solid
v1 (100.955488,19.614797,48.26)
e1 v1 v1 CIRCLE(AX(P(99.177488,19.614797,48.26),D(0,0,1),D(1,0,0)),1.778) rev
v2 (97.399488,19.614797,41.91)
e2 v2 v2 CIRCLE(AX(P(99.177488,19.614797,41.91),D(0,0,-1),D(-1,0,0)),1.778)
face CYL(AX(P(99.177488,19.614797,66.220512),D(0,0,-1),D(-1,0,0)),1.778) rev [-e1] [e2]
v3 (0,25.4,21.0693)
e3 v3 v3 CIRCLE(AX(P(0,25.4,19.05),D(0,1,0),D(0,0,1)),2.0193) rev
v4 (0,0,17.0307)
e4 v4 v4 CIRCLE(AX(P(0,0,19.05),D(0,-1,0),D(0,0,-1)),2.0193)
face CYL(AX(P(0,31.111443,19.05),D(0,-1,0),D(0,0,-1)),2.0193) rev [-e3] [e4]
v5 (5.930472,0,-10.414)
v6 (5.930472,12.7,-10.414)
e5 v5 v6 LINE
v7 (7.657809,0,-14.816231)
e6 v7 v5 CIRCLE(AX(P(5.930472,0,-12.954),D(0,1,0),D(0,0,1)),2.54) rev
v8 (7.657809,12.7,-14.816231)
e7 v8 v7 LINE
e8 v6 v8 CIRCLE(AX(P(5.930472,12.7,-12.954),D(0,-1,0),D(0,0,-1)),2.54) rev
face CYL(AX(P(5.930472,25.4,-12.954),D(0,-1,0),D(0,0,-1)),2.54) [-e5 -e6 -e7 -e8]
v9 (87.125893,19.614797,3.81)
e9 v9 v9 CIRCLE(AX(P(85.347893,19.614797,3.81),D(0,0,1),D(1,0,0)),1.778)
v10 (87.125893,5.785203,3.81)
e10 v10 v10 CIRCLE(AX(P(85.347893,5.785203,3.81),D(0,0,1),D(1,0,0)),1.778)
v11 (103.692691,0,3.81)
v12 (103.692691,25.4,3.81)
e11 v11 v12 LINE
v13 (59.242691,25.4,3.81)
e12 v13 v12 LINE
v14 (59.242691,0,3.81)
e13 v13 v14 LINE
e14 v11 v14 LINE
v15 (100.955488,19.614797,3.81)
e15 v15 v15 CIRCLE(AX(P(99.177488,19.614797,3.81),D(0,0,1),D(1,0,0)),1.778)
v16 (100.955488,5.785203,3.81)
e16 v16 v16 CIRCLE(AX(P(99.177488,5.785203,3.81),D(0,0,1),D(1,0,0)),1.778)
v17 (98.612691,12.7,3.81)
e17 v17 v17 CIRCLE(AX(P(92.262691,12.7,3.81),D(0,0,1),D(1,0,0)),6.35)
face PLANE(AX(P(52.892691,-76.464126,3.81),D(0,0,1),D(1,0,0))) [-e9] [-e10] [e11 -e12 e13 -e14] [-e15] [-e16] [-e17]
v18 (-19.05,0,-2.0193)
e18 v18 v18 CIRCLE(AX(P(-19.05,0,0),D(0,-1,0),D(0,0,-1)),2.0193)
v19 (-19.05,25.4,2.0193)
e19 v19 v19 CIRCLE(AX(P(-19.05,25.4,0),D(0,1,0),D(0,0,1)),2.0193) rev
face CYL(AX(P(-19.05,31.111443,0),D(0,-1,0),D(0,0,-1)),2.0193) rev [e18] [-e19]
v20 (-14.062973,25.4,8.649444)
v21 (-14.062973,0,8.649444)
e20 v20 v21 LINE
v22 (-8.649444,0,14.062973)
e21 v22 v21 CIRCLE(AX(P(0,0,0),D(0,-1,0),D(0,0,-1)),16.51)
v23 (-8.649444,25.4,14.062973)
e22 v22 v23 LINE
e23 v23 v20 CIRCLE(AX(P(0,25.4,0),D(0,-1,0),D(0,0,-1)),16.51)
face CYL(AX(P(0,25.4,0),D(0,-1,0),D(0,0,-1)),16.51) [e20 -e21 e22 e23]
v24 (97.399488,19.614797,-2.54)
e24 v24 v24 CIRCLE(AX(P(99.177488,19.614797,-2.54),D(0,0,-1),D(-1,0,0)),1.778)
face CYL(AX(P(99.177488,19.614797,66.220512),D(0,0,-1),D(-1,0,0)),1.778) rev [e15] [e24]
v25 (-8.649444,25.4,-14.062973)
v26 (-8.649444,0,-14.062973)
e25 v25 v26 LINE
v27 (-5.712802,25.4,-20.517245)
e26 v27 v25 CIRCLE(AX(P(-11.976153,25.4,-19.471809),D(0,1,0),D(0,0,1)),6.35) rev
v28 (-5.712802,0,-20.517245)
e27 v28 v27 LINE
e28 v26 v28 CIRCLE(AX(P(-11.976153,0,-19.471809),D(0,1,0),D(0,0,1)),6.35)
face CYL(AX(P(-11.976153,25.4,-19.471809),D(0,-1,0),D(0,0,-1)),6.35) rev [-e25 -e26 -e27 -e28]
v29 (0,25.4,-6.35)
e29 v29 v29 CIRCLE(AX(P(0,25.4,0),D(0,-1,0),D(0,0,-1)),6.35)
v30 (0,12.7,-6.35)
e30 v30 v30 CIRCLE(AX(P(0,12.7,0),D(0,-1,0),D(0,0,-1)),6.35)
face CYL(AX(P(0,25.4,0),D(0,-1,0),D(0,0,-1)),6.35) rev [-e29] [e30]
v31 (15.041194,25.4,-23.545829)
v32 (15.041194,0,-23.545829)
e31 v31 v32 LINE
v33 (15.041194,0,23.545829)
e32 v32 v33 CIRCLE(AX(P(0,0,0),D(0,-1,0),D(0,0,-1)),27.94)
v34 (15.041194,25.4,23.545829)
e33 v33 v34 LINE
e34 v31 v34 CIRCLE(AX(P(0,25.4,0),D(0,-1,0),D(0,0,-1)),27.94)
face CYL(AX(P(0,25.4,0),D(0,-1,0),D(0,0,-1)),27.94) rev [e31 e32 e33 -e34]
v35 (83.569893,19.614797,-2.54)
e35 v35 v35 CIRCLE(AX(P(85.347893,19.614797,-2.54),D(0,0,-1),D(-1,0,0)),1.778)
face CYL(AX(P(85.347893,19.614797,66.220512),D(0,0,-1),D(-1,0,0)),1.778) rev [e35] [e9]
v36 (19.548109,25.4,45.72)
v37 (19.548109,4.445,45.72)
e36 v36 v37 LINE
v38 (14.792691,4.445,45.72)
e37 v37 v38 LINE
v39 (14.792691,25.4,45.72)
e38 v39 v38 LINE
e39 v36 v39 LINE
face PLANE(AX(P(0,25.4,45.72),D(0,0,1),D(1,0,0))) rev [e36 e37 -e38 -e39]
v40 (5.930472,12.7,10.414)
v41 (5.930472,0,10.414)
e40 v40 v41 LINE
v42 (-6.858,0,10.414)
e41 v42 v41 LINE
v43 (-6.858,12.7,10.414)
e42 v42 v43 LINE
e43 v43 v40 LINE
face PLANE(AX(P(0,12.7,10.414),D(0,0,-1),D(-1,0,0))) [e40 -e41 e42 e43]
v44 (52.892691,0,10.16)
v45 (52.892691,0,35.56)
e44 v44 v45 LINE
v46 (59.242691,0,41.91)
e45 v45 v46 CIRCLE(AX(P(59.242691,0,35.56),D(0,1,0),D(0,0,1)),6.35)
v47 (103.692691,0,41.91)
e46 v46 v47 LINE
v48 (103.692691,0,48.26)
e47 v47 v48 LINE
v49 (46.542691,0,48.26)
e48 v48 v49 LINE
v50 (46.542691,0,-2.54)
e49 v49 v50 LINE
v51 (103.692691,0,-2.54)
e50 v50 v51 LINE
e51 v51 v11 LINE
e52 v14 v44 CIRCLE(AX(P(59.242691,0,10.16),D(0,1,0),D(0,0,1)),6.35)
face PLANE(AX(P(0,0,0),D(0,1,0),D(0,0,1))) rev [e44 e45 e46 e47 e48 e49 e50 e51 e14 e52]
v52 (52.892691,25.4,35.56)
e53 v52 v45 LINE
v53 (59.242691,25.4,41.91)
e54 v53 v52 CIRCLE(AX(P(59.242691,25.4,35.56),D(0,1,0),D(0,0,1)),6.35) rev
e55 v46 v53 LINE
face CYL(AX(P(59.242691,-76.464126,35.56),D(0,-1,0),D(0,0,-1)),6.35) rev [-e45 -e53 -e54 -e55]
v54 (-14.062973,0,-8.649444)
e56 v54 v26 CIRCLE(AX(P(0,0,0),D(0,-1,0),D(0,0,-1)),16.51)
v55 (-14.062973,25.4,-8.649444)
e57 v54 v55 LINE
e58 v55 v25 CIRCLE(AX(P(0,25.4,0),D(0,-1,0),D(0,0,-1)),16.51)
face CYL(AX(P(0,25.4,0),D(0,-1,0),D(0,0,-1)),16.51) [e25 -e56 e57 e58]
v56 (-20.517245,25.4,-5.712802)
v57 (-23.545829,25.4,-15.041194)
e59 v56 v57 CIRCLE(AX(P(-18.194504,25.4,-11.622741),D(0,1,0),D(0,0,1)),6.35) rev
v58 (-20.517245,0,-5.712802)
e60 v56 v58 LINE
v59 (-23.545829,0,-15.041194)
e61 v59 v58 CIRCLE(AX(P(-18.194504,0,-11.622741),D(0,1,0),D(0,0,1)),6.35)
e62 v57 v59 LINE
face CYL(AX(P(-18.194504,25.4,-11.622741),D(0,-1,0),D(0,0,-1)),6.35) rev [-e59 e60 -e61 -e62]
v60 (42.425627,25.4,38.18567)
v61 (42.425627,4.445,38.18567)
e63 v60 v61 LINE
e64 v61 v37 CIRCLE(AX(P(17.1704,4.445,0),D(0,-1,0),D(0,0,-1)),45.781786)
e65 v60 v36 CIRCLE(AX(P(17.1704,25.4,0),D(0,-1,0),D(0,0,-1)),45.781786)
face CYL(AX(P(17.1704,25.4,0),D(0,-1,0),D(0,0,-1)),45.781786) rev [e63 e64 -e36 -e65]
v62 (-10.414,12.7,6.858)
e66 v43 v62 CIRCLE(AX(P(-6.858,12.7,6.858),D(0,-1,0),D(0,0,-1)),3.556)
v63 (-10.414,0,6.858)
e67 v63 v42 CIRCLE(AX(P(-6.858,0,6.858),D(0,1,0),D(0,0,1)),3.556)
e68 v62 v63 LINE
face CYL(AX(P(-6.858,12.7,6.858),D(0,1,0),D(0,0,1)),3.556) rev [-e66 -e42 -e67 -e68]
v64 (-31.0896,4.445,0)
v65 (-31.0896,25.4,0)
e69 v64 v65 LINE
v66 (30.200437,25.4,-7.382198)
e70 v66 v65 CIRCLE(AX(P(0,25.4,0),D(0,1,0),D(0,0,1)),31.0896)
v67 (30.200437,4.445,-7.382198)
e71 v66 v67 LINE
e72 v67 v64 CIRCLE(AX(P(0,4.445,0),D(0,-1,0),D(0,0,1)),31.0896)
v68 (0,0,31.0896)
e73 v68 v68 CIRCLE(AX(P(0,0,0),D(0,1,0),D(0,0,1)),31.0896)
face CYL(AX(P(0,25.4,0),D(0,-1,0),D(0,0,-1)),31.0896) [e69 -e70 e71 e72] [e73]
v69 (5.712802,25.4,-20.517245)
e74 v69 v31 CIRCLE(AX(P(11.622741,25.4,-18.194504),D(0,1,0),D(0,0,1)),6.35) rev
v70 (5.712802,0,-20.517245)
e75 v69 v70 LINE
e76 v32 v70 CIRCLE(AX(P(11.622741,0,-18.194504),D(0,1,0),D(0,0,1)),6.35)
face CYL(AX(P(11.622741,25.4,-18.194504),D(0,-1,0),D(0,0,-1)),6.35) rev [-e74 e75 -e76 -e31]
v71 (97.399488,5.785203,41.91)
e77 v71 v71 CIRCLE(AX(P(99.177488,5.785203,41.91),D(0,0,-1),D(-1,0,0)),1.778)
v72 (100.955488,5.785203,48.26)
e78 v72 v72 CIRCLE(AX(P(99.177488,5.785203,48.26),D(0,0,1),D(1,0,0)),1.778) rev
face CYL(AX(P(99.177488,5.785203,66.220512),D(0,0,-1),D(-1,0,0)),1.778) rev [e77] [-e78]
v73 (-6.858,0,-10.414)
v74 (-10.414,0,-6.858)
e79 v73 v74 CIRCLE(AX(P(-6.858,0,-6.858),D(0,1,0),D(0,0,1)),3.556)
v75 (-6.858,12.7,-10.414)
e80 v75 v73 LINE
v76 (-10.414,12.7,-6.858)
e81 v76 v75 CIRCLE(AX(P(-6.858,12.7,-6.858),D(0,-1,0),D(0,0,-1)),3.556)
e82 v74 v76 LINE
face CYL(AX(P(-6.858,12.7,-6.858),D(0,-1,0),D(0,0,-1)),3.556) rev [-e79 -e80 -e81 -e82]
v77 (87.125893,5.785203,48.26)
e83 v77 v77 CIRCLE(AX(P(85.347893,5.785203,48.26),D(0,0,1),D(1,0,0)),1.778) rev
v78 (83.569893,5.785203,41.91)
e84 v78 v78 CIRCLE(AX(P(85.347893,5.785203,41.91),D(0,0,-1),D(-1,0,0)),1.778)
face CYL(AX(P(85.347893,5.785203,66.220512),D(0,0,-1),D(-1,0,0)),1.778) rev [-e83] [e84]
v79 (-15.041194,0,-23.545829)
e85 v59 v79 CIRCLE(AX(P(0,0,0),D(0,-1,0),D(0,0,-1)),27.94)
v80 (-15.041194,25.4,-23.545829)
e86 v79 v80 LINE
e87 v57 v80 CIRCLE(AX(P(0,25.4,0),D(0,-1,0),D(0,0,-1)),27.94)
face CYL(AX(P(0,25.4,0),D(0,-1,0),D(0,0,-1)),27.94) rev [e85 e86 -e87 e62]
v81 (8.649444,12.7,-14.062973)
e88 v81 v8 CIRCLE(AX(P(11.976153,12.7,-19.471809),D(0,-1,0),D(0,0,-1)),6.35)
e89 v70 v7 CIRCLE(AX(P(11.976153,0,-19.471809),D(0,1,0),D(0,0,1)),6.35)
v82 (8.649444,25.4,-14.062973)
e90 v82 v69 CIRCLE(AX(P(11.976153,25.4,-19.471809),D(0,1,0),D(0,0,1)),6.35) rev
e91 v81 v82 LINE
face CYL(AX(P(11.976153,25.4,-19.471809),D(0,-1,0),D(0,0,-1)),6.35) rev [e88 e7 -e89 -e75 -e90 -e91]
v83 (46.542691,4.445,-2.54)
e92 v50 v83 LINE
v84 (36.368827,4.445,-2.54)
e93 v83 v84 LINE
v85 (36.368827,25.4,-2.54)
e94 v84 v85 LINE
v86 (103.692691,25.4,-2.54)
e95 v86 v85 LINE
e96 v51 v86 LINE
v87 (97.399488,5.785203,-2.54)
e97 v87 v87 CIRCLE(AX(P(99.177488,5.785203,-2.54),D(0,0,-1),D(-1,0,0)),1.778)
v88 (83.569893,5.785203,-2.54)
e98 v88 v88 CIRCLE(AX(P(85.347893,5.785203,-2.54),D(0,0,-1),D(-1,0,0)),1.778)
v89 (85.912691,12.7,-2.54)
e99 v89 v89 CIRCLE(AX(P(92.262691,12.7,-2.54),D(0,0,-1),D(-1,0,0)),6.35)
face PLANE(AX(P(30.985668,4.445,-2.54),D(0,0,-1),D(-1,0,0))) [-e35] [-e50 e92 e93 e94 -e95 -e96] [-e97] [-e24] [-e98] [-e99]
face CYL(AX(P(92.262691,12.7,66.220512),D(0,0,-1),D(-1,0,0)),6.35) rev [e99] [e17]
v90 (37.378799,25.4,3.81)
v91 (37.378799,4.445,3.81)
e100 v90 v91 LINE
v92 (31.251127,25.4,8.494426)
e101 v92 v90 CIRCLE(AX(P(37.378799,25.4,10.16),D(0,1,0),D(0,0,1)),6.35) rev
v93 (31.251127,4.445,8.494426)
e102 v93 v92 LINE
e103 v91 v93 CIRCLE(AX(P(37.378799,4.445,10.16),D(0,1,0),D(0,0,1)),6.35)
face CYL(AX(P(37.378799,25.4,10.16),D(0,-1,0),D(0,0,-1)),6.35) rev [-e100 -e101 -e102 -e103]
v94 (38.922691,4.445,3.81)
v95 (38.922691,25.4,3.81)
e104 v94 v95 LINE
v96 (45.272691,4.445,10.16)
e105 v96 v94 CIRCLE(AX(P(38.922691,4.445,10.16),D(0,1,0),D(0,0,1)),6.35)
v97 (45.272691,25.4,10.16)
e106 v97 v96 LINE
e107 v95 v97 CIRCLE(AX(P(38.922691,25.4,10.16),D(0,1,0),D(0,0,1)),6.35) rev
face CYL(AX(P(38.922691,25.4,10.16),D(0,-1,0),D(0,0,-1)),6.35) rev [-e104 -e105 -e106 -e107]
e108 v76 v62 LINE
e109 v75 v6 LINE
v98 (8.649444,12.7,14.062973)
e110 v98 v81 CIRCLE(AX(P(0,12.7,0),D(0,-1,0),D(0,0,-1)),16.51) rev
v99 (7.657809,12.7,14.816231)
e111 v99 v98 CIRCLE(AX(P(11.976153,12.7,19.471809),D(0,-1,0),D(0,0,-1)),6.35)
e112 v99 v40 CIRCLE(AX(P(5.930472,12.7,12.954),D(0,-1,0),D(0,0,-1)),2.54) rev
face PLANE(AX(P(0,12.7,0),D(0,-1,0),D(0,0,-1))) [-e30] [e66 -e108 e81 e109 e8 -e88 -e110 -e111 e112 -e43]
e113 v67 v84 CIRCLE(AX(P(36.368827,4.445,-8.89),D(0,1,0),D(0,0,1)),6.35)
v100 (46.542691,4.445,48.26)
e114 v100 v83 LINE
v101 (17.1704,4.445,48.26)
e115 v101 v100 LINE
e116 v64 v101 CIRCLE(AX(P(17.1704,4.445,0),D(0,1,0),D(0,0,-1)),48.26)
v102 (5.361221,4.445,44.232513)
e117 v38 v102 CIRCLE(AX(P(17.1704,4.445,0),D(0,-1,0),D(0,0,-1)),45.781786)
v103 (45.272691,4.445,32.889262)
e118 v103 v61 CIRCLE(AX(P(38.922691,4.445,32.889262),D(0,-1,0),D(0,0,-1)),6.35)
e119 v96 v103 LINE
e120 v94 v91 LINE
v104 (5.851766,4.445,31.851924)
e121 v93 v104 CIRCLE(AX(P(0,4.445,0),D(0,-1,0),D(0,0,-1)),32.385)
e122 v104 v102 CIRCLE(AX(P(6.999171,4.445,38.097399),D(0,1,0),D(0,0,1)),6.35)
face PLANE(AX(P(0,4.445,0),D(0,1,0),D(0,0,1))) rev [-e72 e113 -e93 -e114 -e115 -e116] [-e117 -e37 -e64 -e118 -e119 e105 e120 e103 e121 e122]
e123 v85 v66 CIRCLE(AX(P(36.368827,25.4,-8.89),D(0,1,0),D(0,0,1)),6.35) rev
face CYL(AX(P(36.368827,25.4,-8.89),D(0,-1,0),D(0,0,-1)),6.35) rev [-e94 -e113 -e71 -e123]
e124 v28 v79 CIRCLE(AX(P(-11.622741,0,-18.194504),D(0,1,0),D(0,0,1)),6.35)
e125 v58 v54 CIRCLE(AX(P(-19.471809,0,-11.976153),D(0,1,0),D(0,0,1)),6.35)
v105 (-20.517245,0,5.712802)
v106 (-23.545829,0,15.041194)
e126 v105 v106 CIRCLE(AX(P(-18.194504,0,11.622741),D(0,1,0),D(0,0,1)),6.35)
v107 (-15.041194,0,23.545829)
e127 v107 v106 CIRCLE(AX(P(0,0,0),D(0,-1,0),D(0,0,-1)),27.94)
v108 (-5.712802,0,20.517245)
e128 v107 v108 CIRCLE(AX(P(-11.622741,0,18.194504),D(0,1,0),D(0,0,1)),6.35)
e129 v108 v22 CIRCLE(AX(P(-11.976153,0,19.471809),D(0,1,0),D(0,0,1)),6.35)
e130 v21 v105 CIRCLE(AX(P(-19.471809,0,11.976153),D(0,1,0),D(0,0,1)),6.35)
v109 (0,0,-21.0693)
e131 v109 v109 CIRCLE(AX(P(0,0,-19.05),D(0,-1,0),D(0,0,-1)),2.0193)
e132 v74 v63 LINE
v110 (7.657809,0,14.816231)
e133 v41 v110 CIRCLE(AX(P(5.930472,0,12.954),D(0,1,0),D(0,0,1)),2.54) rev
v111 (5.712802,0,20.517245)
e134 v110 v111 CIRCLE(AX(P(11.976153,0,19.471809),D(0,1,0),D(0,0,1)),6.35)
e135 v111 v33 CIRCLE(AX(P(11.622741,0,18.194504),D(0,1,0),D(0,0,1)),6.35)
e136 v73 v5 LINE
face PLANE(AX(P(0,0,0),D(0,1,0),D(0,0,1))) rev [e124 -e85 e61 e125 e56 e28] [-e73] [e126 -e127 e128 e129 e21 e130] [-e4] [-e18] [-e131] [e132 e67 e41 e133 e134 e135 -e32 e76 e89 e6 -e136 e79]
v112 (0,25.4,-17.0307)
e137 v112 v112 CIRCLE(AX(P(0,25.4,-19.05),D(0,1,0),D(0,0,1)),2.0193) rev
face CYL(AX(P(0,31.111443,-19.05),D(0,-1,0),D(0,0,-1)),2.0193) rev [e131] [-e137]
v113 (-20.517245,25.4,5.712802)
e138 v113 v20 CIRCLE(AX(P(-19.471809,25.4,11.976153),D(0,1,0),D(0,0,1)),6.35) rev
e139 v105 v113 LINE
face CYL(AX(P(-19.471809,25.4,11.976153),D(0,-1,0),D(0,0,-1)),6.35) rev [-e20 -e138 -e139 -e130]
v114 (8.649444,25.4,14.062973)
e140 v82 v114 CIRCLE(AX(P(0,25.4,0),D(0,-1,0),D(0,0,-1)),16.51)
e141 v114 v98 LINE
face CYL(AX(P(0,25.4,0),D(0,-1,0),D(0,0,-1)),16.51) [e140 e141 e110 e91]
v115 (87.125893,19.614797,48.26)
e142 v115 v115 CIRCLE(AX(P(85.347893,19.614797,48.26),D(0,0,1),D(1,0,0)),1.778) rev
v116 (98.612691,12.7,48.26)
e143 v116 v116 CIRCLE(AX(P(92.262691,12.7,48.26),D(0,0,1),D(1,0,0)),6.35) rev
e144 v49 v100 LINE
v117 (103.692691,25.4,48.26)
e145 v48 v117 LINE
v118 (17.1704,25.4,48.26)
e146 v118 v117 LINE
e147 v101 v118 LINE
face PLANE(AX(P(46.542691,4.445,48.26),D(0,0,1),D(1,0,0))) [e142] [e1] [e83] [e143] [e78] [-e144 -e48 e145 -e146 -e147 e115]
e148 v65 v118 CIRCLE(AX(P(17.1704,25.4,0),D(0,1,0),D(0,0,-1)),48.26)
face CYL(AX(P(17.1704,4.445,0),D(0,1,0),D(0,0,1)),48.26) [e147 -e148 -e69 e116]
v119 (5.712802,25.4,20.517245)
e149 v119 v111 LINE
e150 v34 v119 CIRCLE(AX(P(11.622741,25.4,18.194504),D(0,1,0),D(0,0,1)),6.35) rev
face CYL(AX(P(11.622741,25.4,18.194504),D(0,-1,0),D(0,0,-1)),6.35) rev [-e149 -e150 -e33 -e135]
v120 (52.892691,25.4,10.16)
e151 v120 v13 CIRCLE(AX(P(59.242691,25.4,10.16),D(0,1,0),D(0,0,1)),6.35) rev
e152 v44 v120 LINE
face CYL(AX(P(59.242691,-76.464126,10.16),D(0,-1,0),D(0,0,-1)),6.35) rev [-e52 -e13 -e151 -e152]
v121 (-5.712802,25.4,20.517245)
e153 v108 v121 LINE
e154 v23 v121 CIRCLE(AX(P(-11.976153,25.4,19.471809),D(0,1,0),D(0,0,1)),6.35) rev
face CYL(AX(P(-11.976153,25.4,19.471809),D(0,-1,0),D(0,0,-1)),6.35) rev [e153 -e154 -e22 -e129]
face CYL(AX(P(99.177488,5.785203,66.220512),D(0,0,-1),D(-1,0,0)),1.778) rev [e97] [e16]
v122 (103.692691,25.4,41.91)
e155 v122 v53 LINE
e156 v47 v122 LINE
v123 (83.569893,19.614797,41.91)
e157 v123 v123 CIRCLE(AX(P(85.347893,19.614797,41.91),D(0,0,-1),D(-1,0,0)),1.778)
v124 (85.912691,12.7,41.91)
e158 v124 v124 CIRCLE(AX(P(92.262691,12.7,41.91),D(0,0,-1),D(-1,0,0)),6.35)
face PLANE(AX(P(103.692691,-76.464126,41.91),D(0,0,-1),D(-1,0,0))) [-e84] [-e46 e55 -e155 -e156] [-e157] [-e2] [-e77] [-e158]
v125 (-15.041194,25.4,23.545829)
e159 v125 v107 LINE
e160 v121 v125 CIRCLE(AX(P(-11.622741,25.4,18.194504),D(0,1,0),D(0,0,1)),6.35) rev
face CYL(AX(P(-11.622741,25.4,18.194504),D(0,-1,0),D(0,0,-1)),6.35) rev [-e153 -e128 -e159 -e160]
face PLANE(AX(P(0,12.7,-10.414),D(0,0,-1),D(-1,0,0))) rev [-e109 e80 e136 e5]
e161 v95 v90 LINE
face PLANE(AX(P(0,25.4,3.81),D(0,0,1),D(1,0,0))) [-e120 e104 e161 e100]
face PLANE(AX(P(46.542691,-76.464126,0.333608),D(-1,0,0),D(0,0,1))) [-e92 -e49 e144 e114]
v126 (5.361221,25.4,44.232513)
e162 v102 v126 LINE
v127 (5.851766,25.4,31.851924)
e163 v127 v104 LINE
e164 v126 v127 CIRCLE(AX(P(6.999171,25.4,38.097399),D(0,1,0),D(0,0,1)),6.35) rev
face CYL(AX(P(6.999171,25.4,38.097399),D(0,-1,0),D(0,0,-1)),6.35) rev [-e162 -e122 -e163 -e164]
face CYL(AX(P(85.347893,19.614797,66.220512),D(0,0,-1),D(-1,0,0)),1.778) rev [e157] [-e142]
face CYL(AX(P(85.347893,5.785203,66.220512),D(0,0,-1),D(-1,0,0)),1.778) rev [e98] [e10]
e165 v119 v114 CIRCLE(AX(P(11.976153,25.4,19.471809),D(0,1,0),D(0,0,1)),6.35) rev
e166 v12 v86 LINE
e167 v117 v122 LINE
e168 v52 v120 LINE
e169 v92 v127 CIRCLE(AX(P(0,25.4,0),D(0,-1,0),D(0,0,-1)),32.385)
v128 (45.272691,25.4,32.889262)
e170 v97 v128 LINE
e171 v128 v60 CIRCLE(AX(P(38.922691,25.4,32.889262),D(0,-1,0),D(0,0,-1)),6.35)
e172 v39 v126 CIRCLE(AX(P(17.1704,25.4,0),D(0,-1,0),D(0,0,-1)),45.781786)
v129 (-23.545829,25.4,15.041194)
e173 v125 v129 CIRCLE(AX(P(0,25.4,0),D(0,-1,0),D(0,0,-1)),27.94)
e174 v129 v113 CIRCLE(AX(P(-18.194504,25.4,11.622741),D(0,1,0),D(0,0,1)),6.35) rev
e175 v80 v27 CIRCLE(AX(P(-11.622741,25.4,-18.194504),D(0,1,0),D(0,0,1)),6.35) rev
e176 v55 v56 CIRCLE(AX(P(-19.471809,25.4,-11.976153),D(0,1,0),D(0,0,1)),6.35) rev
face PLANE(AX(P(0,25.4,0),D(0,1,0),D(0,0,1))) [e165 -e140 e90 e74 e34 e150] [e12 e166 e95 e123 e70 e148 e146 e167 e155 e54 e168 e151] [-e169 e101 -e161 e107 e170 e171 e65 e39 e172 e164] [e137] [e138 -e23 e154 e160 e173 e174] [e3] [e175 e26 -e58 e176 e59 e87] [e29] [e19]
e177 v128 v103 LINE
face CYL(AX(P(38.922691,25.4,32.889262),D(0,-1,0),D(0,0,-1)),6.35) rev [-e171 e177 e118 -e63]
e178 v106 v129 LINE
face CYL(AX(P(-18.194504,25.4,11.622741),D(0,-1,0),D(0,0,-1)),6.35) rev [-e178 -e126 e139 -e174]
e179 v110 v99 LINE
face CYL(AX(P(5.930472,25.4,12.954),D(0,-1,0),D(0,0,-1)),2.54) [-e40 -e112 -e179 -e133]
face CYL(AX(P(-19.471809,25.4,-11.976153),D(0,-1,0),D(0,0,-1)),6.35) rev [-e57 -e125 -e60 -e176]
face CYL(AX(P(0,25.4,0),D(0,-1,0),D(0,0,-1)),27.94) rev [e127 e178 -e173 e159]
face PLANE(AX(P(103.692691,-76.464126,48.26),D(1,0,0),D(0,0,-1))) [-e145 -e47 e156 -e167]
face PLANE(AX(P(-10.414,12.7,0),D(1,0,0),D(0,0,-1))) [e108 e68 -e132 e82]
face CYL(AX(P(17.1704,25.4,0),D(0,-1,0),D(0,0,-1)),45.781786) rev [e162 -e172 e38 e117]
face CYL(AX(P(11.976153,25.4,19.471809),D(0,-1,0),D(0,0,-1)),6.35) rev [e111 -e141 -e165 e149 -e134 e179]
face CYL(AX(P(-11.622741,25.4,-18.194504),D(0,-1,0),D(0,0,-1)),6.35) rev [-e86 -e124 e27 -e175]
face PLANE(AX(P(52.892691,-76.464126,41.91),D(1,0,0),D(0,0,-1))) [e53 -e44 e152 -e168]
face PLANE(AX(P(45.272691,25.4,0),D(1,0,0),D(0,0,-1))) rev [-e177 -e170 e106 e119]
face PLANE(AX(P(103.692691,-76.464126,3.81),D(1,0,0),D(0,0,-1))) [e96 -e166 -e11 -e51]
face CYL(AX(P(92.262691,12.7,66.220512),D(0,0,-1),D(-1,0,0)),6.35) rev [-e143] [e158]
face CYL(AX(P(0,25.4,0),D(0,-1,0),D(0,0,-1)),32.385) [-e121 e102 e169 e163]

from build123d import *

# Parameters (mm, degrees)
SKETCH1_R           = 31.0896
BOSS_EXTRUDE1_DEPTH = 25.4
BOSS_EXTRUDE2_START = -20.955
BOSS_EXTRUDE2_DEPTH = 20.955
BOSS_EXTRUDE3_DEPTH = 25.4
CUT_EXTRUDE1_REACH  = 120.228
SKETCH4_R           = 6.35
SKETCH4_R_2         = 1.778
FILLET8_R           = 6.35
FILLET9_R           = 6.35
FILLET10_R          = 6.35
SKETCH12_R          = 2.0193
CUT_EXTRUDE7_DEPTH  = 25.4
CUT_EXTRUDE8_DEPTH  = 117.276883782
CUT_EXTRUDE9_DEPTH  = 118.15955649
FILLET14_R          = 6.35
SKETCH14_R          = 6.35
CUT_EXTRUDE10_DEPTH = 12.7
FILLET17_R          = 2.54
SKETCH14_3_R        = 6.35
CUT_EXTRUDE11_DEPTH = 118.15955649
FILLET18_R          = 3.556
FILLET19_R          = 6.35
FILLET20_R          = 6.35


with BuildPart() as part:
    # Sketch1 → Boss-Extrude1 (new body)
    with BuildSketch(Plane(origin=(0, 0, 0), x_dir=(1, 0, 0), z_dir=(0, 1, 0))):
        with Locations(Location((0, 0, 0), (0, 0, 270))):
            Circle(SKETCH1_R)
    extrude(amount=BOSS_EXTRUDE1_DEPTH)

    # Sketch2 → Boss-Extrude2 (add)
    with BuildSketch(Plane(origin=(0, 25.4, 0), x_dir=(1, 0, 0), z_dir=(0, 1, 0)).offset(BOSS_EXTRUDE2_START)):
        with BuildLine():
            Line((46.542690567, -48.26), (17.1704, -48.26))
            ThreePointArc((17.1704, -48.26), (-16.95457326, -34.12497326), (-31.0896, 0))
            ThreePointArc((-31.0896, 0), (1.271062728, -31.063606161), (30.985668109, 2.54))
            Line((30.985668109, 2.54), (46.542690567, 2.54))
            Line((46.542690567, 2.54), (46.542690567, -48.26))
        make_face()
    extrude(amount=BOSS_EXTRUDE2_DEPTH)

    # Sketch3 → Boss-Extrude3 (add)
    with BuildSketch(Plane(origin=(0, 25.4, 0), x_dir=(1, 0, 0), z_dir=(0, 1, 0))):
        Polygon((46.542690567, -0.333607673), (46.542690567, -48.26), (103.692690567, -48.26), (103.692690567, -41.91), (52.892690567, -41.91), (52.892690567, -3.81), (103.692690567, -3.81), (103.692690567, 2.54), (46.542690567, 2.54), align=None)
    extrude(amount=-BOSS_EXTRUDE3_DEPTH)

    # Cut-Extrude1: up to this face of the body (flat: up to its plane)
    cut_extrude1_end = Plane(part.part.faces().sort_by_distance((62.236361561, 13.361765969, 48.26))[0])
    # Sketch4 → Cut-Extrude1 (cut, up to the picked face)
    with BuildSketch(Plane(origin=(0, 0, -2.54), x_dir=(-1, 0, 0), z_dir=(0, 0, -1)), mode=Mode.PRIVATE) as cut_extrude1_sk1:
        with Locations((-92.262690567, 12.7)):
            Circle(SKETCH4_R)
    cut_extrude1_tool1 = split(extrude(cut_extrude1_sk1.sketch, amount=-CUT_EXTRUDE1_REACH, mode=Mode.PRIVATE), bisect_by=cut_extrude1_end, keep=Keep.BOTH, mode=Mode.PRIVATE)
    # Sketch4 → Cut-Extrude1 (cut, up to the picked face)
    with BuildSketch(Plane(origin=(0, 0, -2.54), x_dir=(-1, 0, 0), z_dir=(0, 0, -1)), mode=Mode.PRIVATE) as cut_extrude1_sk2:
        with Locations((-85.347893353, 5.785202787)):
            Circle(SKETCH4_R_2)
    cut_extrude1_tool2 = split(extrude(cut_extrude1_sk2.sketch, amount=-CUT_EXTRUDE1_REACH, mode=Mode.PRIVATE), bisect_by=cut_extrude1_end, keep=Keep.BOTH, mode=Mode.PRIVATE)
    # Sketch4 → Cut-Extrude1 (cut, up to the picked face)
    with BuildSketch(Plane(origin=(0, 0, -2.54), x_dir=(-1, 0, 0), z_dir=(0, 0, -1)), mode=Mode.PRIVATE) as cut_extrude1_sk3:
        with Locations((-99.17748778, 19.614797213)):
            Circle(SKETCH4_R_2)
    cut_extrude1_tool3 = split(extrude(cut_extrude1_sk3.sketch, amount=-CUT_EXTRUDE1_REACH, mode=Mode.PRIVATE), bisect_by=cut_extrude1_end, keep=Keep.BOTH, mode=Mode.PRIVATE)
    # Sketch4 → Cut-Extrude1 (cut, up to the picked face)
    with BuildSketch(Plane(origin=(0, 0, -2.54), x_dir=(-1, 0, 0), z_dir=(0, 0, -1)), mode=Mode.PRIVATE) as cut_extrude1_sk4:
        with Locations((-99.17748778, 5.785202787)):
            Circle(SKETCH4_R_2)
    cut_extrude1_tool4 = split(extrude(cut_extrude1_sk4.sketch, amount=-CUT_EXTRUDE1_REACH, mode=Mode.PRIVATE), bisect_by=cut_extrude1_end, keep=Keep.BOTH, mode=Mode.PRIVATE)
    # Sketch4 → Cut-Extrude1 (cut, up to the picked face)
    with BuildSketch(Plane(origin=(0, 0, -2.54), x_dir=(-1, 0, 0), z_dir=(0, 0, -1)), mode=Mode.PRIVATE) as cut_extrude1_sk5:
        with Locations((-85.347893353, 19.614797213)):
            Circle(SKETCH4_R_2)
    cut_extrude1_tool5 = split(extrude(cut_extrude1_sk5.sketch, amount=-CUT_EXTRUDE1_REACH, mode=Mode.PRIVATE), bisect_by=cut_extrude1_end, keep=Keep.BOTH, mode=Mode.PRIVATE)
    add(cut_extrude1_tool1.solids().sort_by(Axis((92.262691, 12.7, -2.54), (0, 0, 1)))[0], mode=Mode.SUBTRACT)
    add(cut_extrude1_tool2.solids().sort_by(Axis((85.347893, 5.785203, -2.54), (0, 0, 1)))[0], mode=Mode.SUBTRACT)
    add(cut_extrude1_tool3.solids().sort_by(Axis((99.177488, 19.614797, -2.54), (0, 0, 1)))[0], mode=Mode.SUBTRACT)
    add(cut_extrude1_tool4.solids().sort_by(Axis((99.177488, 5.785203, -2.54), (0, 0, 1)))[0], mode=Mode.SUBTRACT)
    add(cut_extrude1_tool5.solids().sort_by(Axis((85.347893, 19.614797, -2.54), (0, 0, 1)))[0], mode=Mode.SUBTRACT)

    # Fillet8
    fillet8_edges = [part.edges().sort_by_distance(p)[0] for p in [
        (30.985668109, 14.9225, -2.54),
    ]]
    fillet(fillet8_edges, radius=FILLET8_R)

    # Fillet9
    fillet9_edges = [part.edges().sort_by_distance(p)[0] for p in [
        (52.892690567, 12.7, 41.91),
    ]]
    fillet(fillet9_edges, radius=FILLET9_R)

    # Fillet10
    fillet10_edges = [part.edges().sort_by_distance(p)[0] for p in [
        (52.892690567, 12.7, 3.81),
    ]]
    fillet(fillet10_edges, radius=FILLET10_R)

    # Sketch12 → Cut-Extrude7 (cut)
    with BuildSketch(Plane.XZ):
        with Locations(Location((0, 19.05, 0), (0, 0, 270))):
            Circle(SKETCH12_R)
        with Locations(Location((-19.05, 0, 0), (0, 0, 270))):
            Circle(SKETCH12_R)
        with Locations(Location((0, -19.05, 0), (0, 0, 270))):
            Circle(SKETCH12_R)
    extrude(amount=-CUT_EXTRUDE7_DEPTH, mode=Mode.SUBTRACT)

    # Sketch11 → Cut-Extrude8 (cut, through all)
    with BuildSketch(Plane(origin=(0, 4.445, 0), x_dir=(-1, 0, 0), z_dir=(0, -1, 0))):
        with BuildLine():
            ThreePointArc((-42.42562716, -38.185670129), (-31.491235445, -43.484314118), (-19.548109433, -45.72))
            Line((-19.548109433, -45.72), (-14.792690567, -45.72))
            ThreePointArc((-14.792690567, -45.72), (6.265591504, -39.328440147), (21.908663776, -23.849500552))
            ThreePointArc((21.908663776, -23.849500552), (-11.254705201, -30.366426129), (-32.160101446, -3.81))
            Line((-32.160101446, -3.81), (-45.272690567, -3.81))
            Line((-45.272690567, -3.81), (-45.272690567, -32.889262364))
            ThreePointArc((-45.272690567, -32.889262364), (-44.515817928, -35.895826235), (-42.42562716, -38.185670129))
        make_face()
    extrude(amount=-CUT_EXTRUDE8_DEPTH, mode=Mode.SUBTRACT)

    # Sketch13 → Cut-Extrude9 (cut, through all)
    with BuildSketch(Plane.XZ):
        with BuildLine():
            ThreePointArc((-15.912153412, 4.402666667), (-11.674332957, 11.674332957), (-4.402666667, 15.912153412))
            Line((-4.402666667, 15.912153412), (-7.450666667, 26.928259621))
            ThreePointArc((-7.450666667, 26.928259621), (-19.756563466, 19.756563466), (-26.928259621, 7.450666667))
            Line((-26.928259621, 7.450666667), (-15.912153412, 4.402666667))
        make_face()
        with BuildLine():
            ThreePointArc((-4.402666667, -15.912153412), (-11.674332957, -11.674332957), (-15.912153412, -4.402666667))
            Line((-15.912153412, -4.402666667), (-26.928259621, -7.450666667))
            ThreePointArc((-26.928259621, -7.450666667), (-19.756563466, -19.756563466), (-7.450666667, -26.928259621))
            Line((-7.450666667, -26.928259621), (-4.402666667, -15.912153412))
        make_face()
        with BuildLine():
            ThreePointArc((16.052613052, -3.859237515), (11.871091462, -11.474200953), (4.402666667, -15.912153412))
            Line((4.402666667, -15.912153412), (7.450666667, -26.928259621))
            ThreePointArc((7.450666667, -26.928259621), (20.089539397, -19.417878535), (27.16596055, -6.531017333))
            Line((27.16596055, -6.531017333), (16.052613052, -3.859237515))
        make_face()
        with BuildLine():
            Line((7.450666667, 26.928259621), (4.402666667, 15.912153412))
            ThreePointArc((4.402666667, 15.912153412), (11.674332957, 11.674332957), (15.912153412, 4.402666667))
            Line((15.912153412, 4.402666667), (26.928259621, 7.450666667))
            ThreePointArc((26.928259621, 7.450666667), (19.756563466, 19.756563466), (7.450666667, 26.928259621))
        make_face()
        with BuildLine():
            Line((26.928259621, 7.450666667), (15.912153412, 4.402666667))
            ThreePointArc((15.912153412, 4.402666667), (16.359855636, 2.221536311), (16.51, 0))
            ThreePointArc((16.51, 0), (16.395254519, -1.943123582), (16.052613052, -3.859237515))
            Line((16.052613052, -3.859237515), (27.16596055, -6.531017333))
            ThreePointArc((27.16596055, -6.531017333), (27.74581534, -3.288362985), (27.94, 0))
            ThreePointArc((27.94, 0), (27.685909537, 3.759522987), (26.928259621, 7.450666667))
        make_face()
    extrude(amount=-CUT_EXTRUDE9_DEPTH, mode=Mode.SUBTRACT)

    # Fillet14
    # the kernel refuses this fillet: 6.35 mm, written as the material it adds along each edge
    with BuildSketch(Plane(origin=(4.402666667, 0, 15.912153412), x_dir=(0.9168524179546728, 0, -0.39922630636102885), z_dir=(0, 1, 0)), Plane(origin=(-15.912153412, 0, 4.402666667), x_dir=(0.39922630636102924, 0, 0.9168524179546726), z_dir=(0, 1, 0)), Plane(origin=(-4.402666667, 0, -15.912153412), x_dir=(-0.9168524179546725, 0, 0.39922630636102946), z_dir=(0, 1, 0))) as fillet14_piece_1:
        with BuildLine():
            CenterArc((5.522661099, -6.287214109), FILLET14_R, 98.063810107, 73.872379787)
            Line((-0.76455301, -5.396462319), (0, 0))
            ThreePointArc((0, 0), (2.315954654, -0.163243317), (4.631909309, 0))
        make_face()
    extrude(amount=25.4)
    with BuildSketch(Plane(origin=(7.450666667, 0, 26.928259621), x_dir=(-0.26666666666666666, 0, -0.9637888196533975), z_dir=(0, 1, 0)), Plane(origin=(-26.928259621, 0, 7.450666667), x_dir=(0.9637888196533974, 0, -0.2666666666666667), z_dir=(0, 1, 0)), Plane(origin=(-7.450666667, 0, -26.928259621), x_dir=(0.2666666666666671, 0, 0.9637888196533972), z_dir=(0, 1, 0))) as fillet14_piece_2:
        with BuildLine():
            CenterArc((7.304942452, -6.35), FILLET14_R, 90, 107.104635177)
            ThreePointArc((1.235807879, -8.217647059), (0.310679271, -4.1550254), (0, 0))
            Line((0, 0), (7.304942452, 0))
        make_face()
    extrude(amount=25.4)
    with BuildSketch(Plane(origin=(-4.402666667, 0, 15.912153412), x_dir=(-0.9168524179546724, 0, -0.3992263063610298), z_dir=(0, 1, 0)), Plane(origin=(-15.912153412, 0, -4.402666667), x_dir=(0.39922630636103035, 0, -0.9168524179546722), z_dir=(0, 1, 0))) as fillet14_piece_3:
        with BuildLine():
            CenterArc((5.522661099, 6.287214109), FILLET14_R, 188.063810107, 73.872379787)
            Line((-0.76455301, 5.396462319), (0, 0))
            ThreePointArc((0, 0), (2.315954654, 0.163243317), (4.631909309, 0))
        make_face()
    extrude(amount=25.4)
    with BuildSketch(Plane(origin=(-7.450666667, 0, 26.928259621), x_dir=(-0.913415305638585, 0, -0.407028843480619), z_dir=(0, 1, 0)), Plane(origin=(-26.928259621, 0, -7.450666667), x_dir=(0.40702884348061935, 0, -0.9134153056385848), z_dir=(0, 1, 0))) as fillet14_piece_4:
        with BuildLine():
            CenterArc((7.365726845, -6.279391075), FILLET14_R, 81.447682412, 107.104635177)
            Line((1.086335771, -7.223715029), (0, 0))
            ThreePointArc((0, 0), (4.1550254, 0.310679271), (8.3100508, 0))
        make_face()
    extrude(amount=25.4)
    with BuildSketch(Plane(origin=(7.450666667, 0, -26.928259621), x_dir=(-0.2666666666666663, 0, 0.9637888196533975), z_dir=(0, 1, 0))) as fillet14_piece_5:
        with BuildLine():
            CenterArc((7.304942452, 6.35), FILLET14_R, 162.895364823, 107.104635177)
            ThreePointArc((1.235807879, 8.217647059), (0.310679271, 4.1550254), (0, 0))
            Line((0, 0), (7.304942452, 0))
        make_face()
    extrude(amount=25.4)
    with BuildSketch(Plane(origin=(4.402666667, 0, -15.912153412), x_dir=(0.2666666666666646, 0, -0.9637888196533979), z_dir=(0, 1, 0))) as fillet14_piece_6:
        with BuildLine():
            CenterArc((5.450352912, -6.35), FILLET14_R, 90, 73.872379787)
            ThreePointArc((-0.649745119, -4.586111111), (-0.163243317, -2.315954654), (0, 0))
            Line((0, 0), (5.450352912, 0))
        make_face()
    extrude(amount=25.4)

    # Sketch14 → Cut-Extrude10 (cut)
    with BuildSketch(Plane.XZ):
        with BuildLine():
            Line((-10.414, -10.414), (10.414, -10.414))
            ThreePointArc((10.414, -10.414), (20.828, 0), (10.414, 10.414))
            Line((10.414, 10.414), (-10.414, 10.414))
            Line((-10.414, 10.414), (-10.414, -10.414))
        make_face()
        with Locations(Location((0, 0, 0), (0, 0, 270))):
            Circle(SKETCH14_R, mode=Mode.SUBTRACT)
    extrude(amount=-CUT_EXTRUDE10_DEPTH, mode=Mode.SUBTRACT)

    # Fillet17
    # the kernel refuses this fillet: 2.54 mm, written as the material it takes off along each edge
    with BuildSketch(Plane(origin=(13.087195122, 12.7, 10.065059555), x_dir=(-0.7525451578932848, 0, 0.6585406481997684), z_dir=(0, -1, 0))) as fillet17_piece_1:
        with BuildLine():
            CenterArc((7.288242174, 2.538935053), FILLET17_R, 131.188669075, 137.152126286)
            Line((5.615548928, 4.450399754), (5.448279603, 4.641546224))
            ThreePointArc((5.448279603, 4.641546224), (2.074222188, 1.688960676), (-0.1125988, 0.227678524))
            Line((-0.1125988, 0.227678524), (-0.049545453, -0.249120951))
            ThreePointArc((-0.049545453, -0.249120951), (6.014734512, -0.336617786), (7.207343199, -0.253893505))
            Line((7.207343199, -0.253893505), (7.214697651, 0))
        make_face()
    extrude(amount=30.736744128, mode=Mode.SUBTRACT)
    with BuildSketch(Plane(origin=(13.087195122, 12.7, -10.065059555), x_dir=(-0.7525451578933744, 0, -0.658540648199666), z_dir=(0, -1, 0))) as fillet17_piece_2:
        with BuildLine():
            CenterArc((7.288242174, -2.538935053), FILLET17_R, 91.659204639, 137.152126286)
            Line((5.615548928, -4.450399754), (5.448279603, -4.641546224))
            ThreePointArc((5.448279603, -4.641546224), (2.074222188, -1.688960676), (-0.1125988, -0.227678524))
            Line((-0.1125988, -0.227678524), (-0.049545453, 0.249120951))
            ThreePointArc((-0.049545453, 0.249120951), (6.014734512, 0.336617786), (7.207343199, 0.253893505))
            Line((7.207343199, 0.253893505), (7.214697651, 0))
        make_face()
    extrude(amount=30.736744128, mode=Mode.SUBTRACT)

    # Sketch14<3> → Cut-Extrude11 (cut, through all)
    with BuildSketch(Plane.XZ):
        with Locations(Location((0, 0, 0), (0, 0, 270))):
            Circle(SKETCH14_3_R)
    extrude(amount=-CUT_EXTRUDE11_DEPTH, mode=Mode.SUBTRACT)

    # Fillet18
    fillet18_edges = [part.edges().sort_by_distance(p)[0] for p in [
        (-10.414, 6.35, -10.414),
        (-10.414, 6.35, 10.414),
    ]]
    fillet(fillet18_edges, radius=FILLET18_R)

    # Fillet19
    fillet19_edges = [part.edges().sort_by_distance(p)[0] for p in [
        (45.272690567, 14.9225, 3.81),
        (32.160101446, 14.9225, 3.81),
    ]]
    fillet(fillet19_edges, radius=FILLET19_R)

    # Fillet20
    fillet20_edges = [part.edges().sort_by_distance(p)[0] for p in [
        (-21.908663776, 14.9225, 23.849500552),
    ]]
    fillet(fillet20_edges, radius=FILLET20_R)


solid = part.part
